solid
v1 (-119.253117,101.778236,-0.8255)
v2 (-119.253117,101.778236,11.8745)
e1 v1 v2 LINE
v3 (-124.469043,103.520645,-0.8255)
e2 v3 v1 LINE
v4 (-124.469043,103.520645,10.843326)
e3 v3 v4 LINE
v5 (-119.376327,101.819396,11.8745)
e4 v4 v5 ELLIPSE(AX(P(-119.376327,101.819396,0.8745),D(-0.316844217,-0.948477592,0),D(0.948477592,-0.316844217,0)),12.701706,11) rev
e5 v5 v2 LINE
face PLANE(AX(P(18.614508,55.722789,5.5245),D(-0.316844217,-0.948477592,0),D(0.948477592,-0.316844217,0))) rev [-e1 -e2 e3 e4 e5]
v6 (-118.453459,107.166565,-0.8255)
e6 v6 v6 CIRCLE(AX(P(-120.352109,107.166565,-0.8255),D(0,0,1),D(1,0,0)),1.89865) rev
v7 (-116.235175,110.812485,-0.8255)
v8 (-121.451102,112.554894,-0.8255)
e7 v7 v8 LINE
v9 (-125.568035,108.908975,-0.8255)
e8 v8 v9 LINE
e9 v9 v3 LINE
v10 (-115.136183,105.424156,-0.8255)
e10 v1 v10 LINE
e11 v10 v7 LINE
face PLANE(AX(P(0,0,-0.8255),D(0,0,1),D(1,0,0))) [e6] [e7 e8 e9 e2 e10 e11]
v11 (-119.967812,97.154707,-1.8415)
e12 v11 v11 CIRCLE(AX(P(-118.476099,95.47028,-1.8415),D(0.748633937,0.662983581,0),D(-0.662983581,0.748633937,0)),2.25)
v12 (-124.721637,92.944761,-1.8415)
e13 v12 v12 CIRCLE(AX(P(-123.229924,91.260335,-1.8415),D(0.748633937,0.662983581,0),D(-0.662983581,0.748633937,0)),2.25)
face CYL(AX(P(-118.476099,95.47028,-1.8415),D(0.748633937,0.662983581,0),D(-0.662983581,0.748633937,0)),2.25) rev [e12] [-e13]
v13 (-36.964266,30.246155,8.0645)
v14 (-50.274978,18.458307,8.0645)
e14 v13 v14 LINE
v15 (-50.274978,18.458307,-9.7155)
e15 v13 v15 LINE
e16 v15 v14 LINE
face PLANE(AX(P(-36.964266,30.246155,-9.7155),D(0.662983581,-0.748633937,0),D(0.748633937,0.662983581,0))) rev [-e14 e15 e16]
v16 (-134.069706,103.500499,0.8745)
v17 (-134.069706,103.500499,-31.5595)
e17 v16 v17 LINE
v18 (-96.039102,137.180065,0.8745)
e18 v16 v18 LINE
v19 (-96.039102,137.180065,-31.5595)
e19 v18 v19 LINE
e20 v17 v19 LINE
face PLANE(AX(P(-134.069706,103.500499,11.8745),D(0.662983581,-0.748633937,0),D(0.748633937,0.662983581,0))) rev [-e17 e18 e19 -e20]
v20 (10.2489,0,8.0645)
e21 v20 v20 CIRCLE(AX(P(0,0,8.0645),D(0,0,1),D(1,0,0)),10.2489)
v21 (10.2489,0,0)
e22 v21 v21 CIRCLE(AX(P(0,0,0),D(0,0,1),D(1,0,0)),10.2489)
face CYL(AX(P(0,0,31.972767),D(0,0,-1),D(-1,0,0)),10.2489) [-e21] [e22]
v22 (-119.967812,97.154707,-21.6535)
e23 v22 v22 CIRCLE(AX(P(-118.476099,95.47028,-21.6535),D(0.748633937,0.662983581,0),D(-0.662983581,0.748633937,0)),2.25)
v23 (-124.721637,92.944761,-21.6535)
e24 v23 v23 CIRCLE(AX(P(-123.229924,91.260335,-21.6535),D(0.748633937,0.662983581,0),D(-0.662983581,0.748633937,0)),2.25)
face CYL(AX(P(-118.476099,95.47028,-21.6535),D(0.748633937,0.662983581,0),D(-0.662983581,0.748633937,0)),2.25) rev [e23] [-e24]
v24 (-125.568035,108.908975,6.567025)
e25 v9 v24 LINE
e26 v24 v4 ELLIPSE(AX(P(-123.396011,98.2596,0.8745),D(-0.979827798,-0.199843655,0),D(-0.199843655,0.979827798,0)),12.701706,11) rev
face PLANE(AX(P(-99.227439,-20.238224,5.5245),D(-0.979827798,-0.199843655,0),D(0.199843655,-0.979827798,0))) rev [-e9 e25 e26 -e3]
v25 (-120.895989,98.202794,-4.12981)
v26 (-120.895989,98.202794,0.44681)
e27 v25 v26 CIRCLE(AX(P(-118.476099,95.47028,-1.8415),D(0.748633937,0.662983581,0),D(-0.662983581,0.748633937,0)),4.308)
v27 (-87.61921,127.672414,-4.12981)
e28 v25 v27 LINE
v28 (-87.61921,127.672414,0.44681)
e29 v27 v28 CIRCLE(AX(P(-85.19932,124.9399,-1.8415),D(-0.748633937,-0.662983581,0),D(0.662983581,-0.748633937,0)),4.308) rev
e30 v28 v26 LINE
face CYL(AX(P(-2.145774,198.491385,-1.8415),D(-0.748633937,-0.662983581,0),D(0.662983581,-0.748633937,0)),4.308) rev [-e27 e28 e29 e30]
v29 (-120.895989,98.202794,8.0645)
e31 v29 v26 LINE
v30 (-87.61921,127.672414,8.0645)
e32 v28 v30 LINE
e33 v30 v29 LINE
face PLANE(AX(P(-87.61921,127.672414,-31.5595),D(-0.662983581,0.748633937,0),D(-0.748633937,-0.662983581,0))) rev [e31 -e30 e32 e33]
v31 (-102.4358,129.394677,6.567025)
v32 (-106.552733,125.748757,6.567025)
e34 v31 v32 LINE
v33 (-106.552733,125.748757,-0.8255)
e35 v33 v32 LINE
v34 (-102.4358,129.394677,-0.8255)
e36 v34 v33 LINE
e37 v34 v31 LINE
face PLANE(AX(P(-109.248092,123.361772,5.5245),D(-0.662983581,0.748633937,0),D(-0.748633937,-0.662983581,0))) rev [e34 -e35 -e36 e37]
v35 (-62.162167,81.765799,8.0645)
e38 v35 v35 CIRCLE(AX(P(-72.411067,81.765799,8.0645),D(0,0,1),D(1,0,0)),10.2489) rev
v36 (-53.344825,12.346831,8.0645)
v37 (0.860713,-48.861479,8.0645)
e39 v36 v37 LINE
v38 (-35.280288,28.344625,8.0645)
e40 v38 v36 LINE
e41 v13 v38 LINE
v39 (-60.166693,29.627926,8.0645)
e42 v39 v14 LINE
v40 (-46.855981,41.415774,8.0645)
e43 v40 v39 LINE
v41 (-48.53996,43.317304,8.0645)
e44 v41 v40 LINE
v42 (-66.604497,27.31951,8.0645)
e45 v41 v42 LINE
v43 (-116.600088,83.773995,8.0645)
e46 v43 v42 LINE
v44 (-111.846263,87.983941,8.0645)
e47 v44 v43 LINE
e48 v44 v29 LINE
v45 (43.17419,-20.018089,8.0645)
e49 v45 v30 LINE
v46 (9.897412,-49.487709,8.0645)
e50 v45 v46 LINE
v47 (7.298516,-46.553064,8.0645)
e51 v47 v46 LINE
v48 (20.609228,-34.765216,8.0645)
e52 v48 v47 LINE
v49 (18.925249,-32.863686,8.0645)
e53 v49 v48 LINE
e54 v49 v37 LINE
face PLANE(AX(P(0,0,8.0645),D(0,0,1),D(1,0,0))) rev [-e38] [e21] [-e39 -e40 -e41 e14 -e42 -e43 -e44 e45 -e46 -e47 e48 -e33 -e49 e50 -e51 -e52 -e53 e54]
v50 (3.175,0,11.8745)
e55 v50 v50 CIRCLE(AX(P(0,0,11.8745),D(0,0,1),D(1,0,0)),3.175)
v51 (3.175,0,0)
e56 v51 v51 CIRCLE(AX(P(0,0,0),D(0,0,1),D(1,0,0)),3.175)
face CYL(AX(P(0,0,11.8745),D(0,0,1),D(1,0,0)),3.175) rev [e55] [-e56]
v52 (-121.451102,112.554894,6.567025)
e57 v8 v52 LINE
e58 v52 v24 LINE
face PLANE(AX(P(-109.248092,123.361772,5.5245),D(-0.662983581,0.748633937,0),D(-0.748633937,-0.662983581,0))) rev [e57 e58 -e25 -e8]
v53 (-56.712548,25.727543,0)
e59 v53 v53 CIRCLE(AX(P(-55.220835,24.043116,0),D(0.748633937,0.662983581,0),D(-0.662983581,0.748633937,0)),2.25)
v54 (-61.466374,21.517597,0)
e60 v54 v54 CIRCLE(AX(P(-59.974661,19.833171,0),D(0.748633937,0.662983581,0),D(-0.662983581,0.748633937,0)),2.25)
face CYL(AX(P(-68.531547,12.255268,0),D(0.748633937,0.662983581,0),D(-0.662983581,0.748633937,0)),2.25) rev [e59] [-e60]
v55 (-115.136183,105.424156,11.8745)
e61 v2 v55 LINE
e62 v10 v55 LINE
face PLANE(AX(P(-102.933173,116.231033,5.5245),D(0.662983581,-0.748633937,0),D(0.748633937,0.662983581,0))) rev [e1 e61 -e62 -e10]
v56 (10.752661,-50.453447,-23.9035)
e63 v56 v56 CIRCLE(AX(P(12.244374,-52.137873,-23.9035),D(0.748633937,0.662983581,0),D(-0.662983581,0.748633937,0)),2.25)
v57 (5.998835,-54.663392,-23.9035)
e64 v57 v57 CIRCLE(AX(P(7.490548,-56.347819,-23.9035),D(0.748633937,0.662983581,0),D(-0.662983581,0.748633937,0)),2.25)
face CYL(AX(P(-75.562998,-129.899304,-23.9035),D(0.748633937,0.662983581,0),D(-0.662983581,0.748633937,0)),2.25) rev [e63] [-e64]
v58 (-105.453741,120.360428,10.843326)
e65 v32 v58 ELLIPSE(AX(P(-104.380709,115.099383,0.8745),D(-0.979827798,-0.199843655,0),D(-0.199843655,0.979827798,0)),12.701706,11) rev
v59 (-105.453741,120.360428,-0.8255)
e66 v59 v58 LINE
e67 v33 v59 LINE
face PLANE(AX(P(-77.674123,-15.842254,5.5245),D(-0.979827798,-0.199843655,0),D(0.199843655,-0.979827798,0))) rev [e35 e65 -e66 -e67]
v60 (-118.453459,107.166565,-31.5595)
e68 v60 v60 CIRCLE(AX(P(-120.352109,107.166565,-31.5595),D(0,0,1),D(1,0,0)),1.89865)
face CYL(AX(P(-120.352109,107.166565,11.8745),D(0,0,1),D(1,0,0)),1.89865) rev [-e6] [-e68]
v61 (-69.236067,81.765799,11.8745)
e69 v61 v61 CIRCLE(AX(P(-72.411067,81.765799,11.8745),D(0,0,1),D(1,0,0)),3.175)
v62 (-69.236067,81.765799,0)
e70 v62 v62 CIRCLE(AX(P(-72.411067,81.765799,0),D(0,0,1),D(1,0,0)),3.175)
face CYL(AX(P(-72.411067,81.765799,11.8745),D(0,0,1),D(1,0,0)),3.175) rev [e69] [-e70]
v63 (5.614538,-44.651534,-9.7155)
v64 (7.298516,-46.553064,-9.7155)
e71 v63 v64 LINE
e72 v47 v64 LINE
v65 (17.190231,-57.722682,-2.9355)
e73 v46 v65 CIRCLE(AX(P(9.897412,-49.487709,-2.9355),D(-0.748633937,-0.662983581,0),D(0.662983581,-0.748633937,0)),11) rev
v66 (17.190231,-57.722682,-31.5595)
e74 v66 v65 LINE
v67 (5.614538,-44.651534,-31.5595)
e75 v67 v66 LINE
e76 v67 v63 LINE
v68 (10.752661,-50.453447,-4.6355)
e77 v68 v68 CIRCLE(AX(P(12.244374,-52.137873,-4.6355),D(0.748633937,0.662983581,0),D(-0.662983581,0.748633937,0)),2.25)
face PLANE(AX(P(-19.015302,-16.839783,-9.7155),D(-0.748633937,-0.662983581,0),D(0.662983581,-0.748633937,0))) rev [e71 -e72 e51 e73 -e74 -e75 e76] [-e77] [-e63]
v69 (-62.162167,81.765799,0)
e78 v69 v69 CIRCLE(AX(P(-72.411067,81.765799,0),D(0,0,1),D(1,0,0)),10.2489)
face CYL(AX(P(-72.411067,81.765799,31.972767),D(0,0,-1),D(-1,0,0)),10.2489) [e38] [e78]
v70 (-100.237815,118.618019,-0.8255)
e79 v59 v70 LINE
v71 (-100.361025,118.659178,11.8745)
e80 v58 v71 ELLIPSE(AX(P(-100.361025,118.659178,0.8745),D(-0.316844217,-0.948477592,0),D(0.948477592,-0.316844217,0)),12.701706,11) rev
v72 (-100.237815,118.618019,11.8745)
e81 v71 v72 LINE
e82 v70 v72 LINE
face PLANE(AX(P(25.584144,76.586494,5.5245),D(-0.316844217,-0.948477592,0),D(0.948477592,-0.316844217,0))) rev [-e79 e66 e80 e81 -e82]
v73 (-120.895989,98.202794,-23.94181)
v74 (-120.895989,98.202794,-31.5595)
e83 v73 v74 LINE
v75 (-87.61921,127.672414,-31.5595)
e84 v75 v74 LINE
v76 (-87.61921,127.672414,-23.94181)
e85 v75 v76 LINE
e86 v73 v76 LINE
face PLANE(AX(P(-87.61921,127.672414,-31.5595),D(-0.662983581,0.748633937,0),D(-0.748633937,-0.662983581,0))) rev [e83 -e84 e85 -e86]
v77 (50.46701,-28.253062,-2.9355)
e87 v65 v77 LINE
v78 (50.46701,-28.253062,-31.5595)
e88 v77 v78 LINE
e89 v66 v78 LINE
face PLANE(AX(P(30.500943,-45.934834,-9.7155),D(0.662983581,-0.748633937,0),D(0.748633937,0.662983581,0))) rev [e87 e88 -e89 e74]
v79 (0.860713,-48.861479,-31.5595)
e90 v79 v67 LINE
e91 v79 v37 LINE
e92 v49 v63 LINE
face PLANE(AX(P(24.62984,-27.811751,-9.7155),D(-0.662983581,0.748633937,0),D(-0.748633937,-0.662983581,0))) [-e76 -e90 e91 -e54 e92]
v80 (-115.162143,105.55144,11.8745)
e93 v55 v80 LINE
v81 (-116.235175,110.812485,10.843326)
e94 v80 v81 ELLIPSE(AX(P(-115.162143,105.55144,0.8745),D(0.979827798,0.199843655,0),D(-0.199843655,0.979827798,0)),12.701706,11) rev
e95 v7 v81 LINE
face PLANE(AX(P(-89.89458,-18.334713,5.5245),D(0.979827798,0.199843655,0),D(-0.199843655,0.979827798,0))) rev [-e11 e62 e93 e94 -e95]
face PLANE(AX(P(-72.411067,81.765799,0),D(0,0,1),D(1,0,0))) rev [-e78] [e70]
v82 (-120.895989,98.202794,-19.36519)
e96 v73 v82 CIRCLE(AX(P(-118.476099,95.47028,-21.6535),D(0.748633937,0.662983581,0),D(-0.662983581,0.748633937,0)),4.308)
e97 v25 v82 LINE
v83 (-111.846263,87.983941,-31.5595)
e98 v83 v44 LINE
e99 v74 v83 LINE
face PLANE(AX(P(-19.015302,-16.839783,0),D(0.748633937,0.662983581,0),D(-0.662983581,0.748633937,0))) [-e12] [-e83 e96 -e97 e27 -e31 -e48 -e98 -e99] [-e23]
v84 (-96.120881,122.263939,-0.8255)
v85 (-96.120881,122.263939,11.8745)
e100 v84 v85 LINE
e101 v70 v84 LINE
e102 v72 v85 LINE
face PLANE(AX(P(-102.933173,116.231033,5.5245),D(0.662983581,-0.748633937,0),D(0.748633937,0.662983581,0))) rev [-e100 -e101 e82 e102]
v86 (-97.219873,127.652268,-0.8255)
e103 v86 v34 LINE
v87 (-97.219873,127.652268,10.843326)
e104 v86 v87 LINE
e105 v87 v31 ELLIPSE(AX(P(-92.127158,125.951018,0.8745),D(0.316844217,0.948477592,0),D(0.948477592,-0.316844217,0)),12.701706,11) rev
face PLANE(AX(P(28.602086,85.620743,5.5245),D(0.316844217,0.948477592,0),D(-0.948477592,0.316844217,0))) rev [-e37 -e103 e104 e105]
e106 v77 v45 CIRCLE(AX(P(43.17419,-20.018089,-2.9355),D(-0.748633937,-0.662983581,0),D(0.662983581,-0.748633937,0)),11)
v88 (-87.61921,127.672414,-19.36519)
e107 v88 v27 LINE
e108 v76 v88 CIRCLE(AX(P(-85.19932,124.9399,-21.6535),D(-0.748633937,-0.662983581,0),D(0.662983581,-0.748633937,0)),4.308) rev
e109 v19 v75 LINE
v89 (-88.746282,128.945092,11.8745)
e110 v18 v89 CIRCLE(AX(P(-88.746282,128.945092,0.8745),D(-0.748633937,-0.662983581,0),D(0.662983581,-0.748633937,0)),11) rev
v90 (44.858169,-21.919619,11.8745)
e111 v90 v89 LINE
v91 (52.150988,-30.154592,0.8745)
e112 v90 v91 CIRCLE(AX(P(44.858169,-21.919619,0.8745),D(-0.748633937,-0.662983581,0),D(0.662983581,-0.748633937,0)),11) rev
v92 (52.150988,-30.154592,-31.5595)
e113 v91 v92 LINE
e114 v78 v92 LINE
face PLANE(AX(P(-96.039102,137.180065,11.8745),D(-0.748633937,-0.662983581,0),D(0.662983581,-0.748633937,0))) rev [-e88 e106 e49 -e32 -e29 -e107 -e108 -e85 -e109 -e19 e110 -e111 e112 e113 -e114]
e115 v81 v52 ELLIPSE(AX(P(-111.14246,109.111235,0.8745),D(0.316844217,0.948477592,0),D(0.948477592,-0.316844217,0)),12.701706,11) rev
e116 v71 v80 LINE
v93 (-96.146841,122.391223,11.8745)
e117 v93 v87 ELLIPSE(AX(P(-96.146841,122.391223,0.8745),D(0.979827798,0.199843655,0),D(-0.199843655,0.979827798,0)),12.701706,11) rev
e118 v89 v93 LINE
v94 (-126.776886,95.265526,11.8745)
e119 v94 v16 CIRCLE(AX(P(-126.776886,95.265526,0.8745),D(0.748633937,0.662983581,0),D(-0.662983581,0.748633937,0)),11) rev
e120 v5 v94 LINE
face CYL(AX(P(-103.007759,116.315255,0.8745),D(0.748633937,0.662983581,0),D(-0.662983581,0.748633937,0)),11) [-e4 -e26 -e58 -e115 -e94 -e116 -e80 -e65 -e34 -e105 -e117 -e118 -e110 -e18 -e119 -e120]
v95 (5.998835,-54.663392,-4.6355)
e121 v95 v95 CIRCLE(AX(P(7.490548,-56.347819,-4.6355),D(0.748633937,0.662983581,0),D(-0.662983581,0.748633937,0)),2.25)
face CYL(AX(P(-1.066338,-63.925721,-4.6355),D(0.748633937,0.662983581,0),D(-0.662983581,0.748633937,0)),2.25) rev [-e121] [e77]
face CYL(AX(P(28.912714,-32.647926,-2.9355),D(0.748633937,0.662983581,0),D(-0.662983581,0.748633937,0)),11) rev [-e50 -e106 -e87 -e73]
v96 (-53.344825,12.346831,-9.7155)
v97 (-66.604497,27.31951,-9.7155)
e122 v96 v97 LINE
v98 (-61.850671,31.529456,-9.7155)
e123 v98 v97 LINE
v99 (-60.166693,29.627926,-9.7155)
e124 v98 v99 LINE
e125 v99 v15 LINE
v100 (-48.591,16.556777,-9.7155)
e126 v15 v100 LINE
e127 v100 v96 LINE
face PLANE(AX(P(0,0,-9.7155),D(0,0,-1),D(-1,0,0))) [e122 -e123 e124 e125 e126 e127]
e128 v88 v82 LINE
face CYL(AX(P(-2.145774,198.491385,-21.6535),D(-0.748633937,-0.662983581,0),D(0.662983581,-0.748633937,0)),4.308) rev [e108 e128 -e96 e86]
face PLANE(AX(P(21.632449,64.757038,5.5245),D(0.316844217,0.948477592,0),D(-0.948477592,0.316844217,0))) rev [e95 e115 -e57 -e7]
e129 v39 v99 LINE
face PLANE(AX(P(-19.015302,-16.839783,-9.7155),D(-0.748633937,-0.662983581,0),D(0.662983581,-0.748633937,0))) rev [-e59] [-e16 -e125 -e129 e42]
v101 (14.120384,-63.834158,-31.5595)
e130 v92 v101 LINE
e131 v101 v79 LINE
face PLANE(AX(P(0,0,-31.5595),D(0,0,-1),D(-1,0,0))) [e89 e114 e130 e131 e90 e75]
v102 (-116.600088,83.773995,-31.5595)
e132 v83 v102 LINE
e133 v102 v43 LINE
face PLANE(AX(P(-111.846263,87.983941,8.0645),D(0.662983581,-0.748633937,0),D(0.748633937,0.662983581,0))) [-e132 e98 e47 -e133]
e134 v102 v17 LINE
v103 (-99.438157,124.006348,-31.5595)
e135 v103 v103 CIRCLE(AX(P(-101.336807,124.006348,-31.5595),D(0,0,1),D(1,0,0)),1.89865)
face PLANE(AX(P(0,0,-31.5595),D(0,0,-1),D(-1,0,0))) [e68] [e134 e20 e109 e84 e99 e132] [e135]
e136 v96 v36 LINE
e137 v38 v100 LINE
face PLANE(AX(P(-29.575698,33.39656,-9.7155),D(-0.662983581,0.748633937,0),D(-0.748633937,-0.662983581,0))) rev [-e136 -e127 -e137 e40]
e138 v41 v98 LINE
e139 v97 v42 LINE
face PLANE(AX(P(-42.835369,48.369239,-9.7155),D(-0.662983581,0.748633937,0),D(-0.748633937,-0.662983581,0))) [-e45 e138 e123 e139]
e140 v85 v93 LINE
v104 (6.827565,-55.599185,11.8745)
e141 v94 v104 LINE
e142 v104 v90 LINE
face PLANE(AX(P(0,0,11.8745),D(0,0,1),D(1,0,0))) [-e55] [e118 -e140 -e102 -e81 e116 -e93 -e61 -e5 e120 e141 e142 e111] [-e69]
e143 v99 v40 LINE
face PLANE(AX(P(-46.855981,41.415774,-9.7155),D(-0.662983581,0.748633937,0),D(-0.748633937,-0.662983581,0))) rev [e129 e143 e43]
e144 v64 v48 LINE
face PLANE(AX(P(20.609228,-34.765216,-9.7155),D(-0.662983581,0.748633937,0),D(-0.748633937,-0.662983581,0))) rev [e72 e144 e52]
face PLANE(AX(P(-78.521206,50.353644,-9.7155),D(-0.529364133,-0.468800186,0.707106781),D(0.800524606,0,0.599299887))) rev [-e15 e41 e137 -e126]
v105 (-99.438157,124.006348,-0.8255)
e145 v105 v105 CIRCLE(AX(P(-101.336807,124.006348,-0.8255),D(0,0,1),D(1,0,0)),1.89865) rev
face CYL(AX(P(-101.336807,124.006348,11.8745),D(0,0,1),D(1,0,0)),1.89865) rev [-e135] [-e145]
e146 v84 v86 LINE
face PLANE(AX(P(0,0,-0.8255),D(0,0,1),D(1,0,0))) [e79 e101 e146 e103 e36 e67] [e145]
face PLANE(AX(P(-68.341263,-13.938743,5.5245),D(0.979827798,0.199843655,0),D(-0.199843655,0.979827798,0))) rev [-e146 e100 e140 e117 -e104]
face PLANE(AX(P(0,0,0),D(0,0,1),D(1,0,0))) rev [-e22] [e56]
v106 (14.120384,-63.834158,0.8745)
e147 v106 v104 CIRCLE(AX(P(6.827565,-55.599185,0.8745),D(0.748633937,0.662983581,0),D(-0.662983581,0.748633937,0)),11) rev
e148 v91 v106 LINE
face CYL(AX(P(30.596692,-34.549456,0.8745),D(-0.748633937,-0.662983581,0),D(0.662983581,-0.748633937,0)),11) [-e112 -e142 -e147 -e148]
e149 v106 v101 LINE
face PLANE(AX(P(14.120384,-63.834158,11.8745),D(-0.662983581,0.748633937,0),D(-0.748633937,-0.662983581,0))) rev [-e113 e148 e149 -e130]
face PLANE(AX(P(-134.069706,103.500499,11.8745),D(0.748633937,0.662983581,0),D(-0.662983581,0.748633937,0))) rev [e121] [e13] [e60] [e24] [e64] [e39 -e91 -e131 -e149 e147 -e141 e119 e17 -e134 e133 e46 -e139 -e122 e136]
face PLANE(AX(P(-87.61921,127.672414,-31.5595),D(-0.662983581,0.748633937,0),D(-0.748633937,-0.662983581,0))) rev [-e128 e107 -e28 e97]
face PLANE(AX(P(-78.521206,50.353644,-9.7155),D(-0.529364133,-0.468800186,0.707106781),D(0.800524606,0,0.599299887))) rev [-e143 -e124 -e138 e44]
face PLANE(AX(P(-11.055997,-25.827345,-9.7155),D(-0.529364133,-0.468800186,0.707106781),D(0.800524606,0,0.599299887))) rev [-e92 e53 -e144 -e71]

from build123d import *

# Parameters (mm, degrees)
SKETCH1_R                   = 10.2489
BOSS_EXTRUDE1_DEPTH         = 2.9845
BOSS_EXTRUDE1_2_DEPTH       = 2.9845
SKETCH2_R                   = 10.2489
BOSS_EXTRUDE2_DEPTH         = 5.08
BOSS_EXTRUDE3_DEPTH         = 3.81
F_1_4_0_25_DIAMETER_HOLE1_D = 6.35
BOSS_EXTRUDE4_DEPTH         = 17.78
SKETCH8_R                   = 2.25
CUT_EXTRUDE1_DEPTH          = 17.78
SKETCH9_W                   = 17.78
SKETCH9_H                   = 2.54
BOSS_EXTRUDE5_DEPTH         = 17.78
CUT_EXTRUDE2_REACH          = 251.195
CUT_EXTRUDE3_DEPTH          = 20
BOSS_EXTRUDE6_DEPTH         = 2.54
BOSS_EXTRUDE7_DEPTH         = 39.624
F_6_CLEARANCE_HOLE1_D       = 3.7973
CUT_EXTRUDE4_DEPTH          = 6.35
SKETCH17_W                  = 39.624
SKETCH17_H                  = 20
BOSS_EXTRUDE8_DEPTH         = 6.35
M4_CLEARANCE_HOLE1_D        = 4.5
SKETCH21_R                  = 4.308
CUT_EXTRUDE5_DEPTH          = 195.822050963
FILLET2_R                   = 11
CUT_EXTRUDE6_DEPTH          = 6.35
BOSS_EXTRUDE9_DEPTH         = 21.844
CUT_EXTRUDE7_DEPTH          = 195.822050963


with BuildPart() as part:
    # Sketch1 → Boss-Extrude1 (new body)
    with BuildSketch(Plane.XY):
        Circle(SKETCH1_R)
    extrude(amount=BOSS_EXTRUDE1_DEPTH)



with BuildPart() as body_2:
    # Sketch1 → Boss-Extrude1 2 (new body)
    with BuildSketch(Plane.XY):
        with Locations((-72.411066703, 81.765798589)):
            Circle(SKETCH1_R)
    extrude(amount=BOSS_EXTRUDE1_2_DEPTH)


with BuildPart() as part_1:
    add(part.part)

    add(body_2.part)  # Boss-Extrude2 merges body 2
    # Sketch2 → Boss-Extrude2 (add)
    with BuildSketch(Plane.XY.offset(2.9845)):
        with Locations((-72.411066703, 81.765798589)):
            Circle(SKETCH2_R)
        Circle(SKETCH2_R)
    extrude(amount=BOSS_EXTRUDE2_DEPTH)

    # Sketch3 → Boss-Extrude3 (add)
    with BuildSketch(Plane.XY.offset(8.0645)):
        Polygon((-134.069705847, 103.500499391), (-96.039101852, 137.180065299), (52.150988145, -30.154592279), (14.12038415, -63.834158187), align=None)
    extrude(amount=BOSS_EXTRUDE3_DEPTH)

    # 1/4 (0.25) Diameter Hole1 (through all)
    with Locations(Plane.XY.offset(11.8745)):
        with Locations((0, 0), (-72.411066703, 81.765798589)):
            Hole(F_1_4_0_25_DIAMETER_HOLE1_D / 2)

    # Sketch7 → Boss-Extrude4 (add)
    with BuildSketch(Plane(origin=(0, 0, 8.0645), x_dir=(-1, 0, 0), z_dir=(0, 0, -1))):
        Polygon((66.604496657, 27.319509971), (61.850671158, 31.529455709), (48.59099954, 16.556776971), (53.34482504, 12.346831233), align=None)
        Polygon((-14.12038415, -63.834158187), (-0.860712533, -48.861479449), (-5.614538032, -44.65153371), (-18.87420965, -59.624212449), align=None)
    extrude(amount=BOSS_EXTRUDE4_DEPTH)

    # Sketch8 → Cut-Extrude1 (cut)
    with BuildSketch(Plane(origin=(-19.015301997, -16.839782954, 0), x_dir=(0, 0, -1), z_dir=(0.7486339369082557, 0.6629835808745536, 0))):
        with Locations(Location((4.6355, -47.15, 0), (0, 0, 90))):
            Circle(SKETCH8_R)
        with Locations(Location((0, 54.61, 0), (0, 0, 90))):
            Circle(SKETCH8_R)
    extrude(amount=-CUT_EXTRUDE1_DEPTH, mode=Mode.SUBTRACT)

    # Sketch9 → Boss-Extrude5 (add)
    with BuildSketch(Plane(origin=(-19.015301997, -16.839782954, 0), x_dir=(0, 0, -1), z_dir=(0.7486339369082557, 0.6629835808745536, 0))):
        with Locations((0.8255, -55.88)):
            Rectangle(SKETCH9_W, SKETCH9_H)
        with Locations((0.8255, 45.88)):
            Rectangle(SKETCH9_W, SKETCH9_H)
        with Locations((0.8255, 63.34)):
            Rectangle(SKETCH9_W, SKETCH9_H)
        with Locations((0.8255, -38.42)):
            Rectangle(SKETCH9_W, SKETCH9_H)
    extrude(amount=BOSS_EXTRUDE5_DEPTH)

    # Cut-Extrude2: up to this face of the body (flat: up to its plane)
    cut_extrude2_end = Plane(part_1.part.faces().sort_by_distance((9.892980981, -40.862582546, -0.8255))[0])
    # Sketch10 → Cut-Extrude2 (cut, up to the picked face)
    with BuildSketch(Plane(origin=(37.889511647, -42.784429494, 0), x_dir=(0.7486339369082557, 0.6629835808745536, 0), z_dir=(0.6629835808745536, -0.7486339369082557, 0)), mode=Mode.PRIVATE) as cut_extrude2_sk1:
        Polygon((-7.62, 8.0645), (-7.62, -9.7155), (-25.4, -9.7155), align=None)
    cut_extrude2_tool1 = split(extrude(cut_extrude2_sk1.sketch, amount=-CUT_EXTRUDE2_REACH, mode=Mode.PRIVATE), bisect_by=cut_extrude2_end, keep=Keep.BOTH, mode=Mode.PRIVATE)
    add(cut_extrude2_tool1.solids().sort_by(Axis((27.748017, -51.765647, -3.788833), (-0.6629835808745536, 0.7486339369082557, 0)))[0], mode=Mode.SUBTRACT)

    # Sketch11 → Cut-Extrude3 (cut)
    with BuildSketch(Plane(origin=(-29.575697543, 33.396559925, 0), x_dir=(0.748633936908256, 0.6629835808745533, 0), z_dir=(0.6629835808745533, -0.748633936908256, 0))):
        Polygon((-7.62, -9.7155), (-7.62, 8.0645), (-25.4, -9.7155), align=None)
    extrude(amount=-CUT_EXTRUDE3_DEPTH, mode=Mode.SUBTRACT)

    # Sketch12 → Boss-Extrude6 (add)
    with BuildSketch(Plane(origin=(37.889511647, -42.784429494, 0), x_dir=(0.7486339369082557, 0.6629835808745536, 0), z_dir=(0.6629835808745536, -0.7486339369082557, 0))):
        Polygon((-25.4, -9.7155), (19.05, -9.7155), (19.05, 8.0645), (-7.62, 8.0645), align=None)
    extrude(amount=-BOSS_EXTRUDE6_DEPTH)

    # Sketch13 → Boss-Extrude7 (add)
    with BuildSketch(Plane(origin=(0, 0, 8.0645), x_dir=(-1, 0, 0), z_dir=(0, 0, -1))):
        Polygon((96.039101852, 137.180065299), (134.069705847, 103.500499391), (125.64981437, 93.992848392), (87.619210375, 127.6724143), align=None)
    extrude(amount=BOSS_EXTRUDE7_DEPTH)

    # #6 Clearance Hole1 (through all)
    with Locations(Plane.XY.offset(11.8745)):
        with Locations((-120.35210911, 107.166565368), (-101.336807112, 124.006348323)):
            Hole(F_6_CLEARANCE_HOLE1_D / 2)

    # Sketch14 → Cut-Extrude4 (cut)
    with BuildSketch(Plane.XY.offset(11.8745)):
        Polygon((-106.55273324, 125.748757468), (-105.45374076, 120.360428364), (-97.219873465, 127.652268281), (-102.435799592, 129.394677426), align=None)
        Polygon((-97.219873465, 127.652268281), (-105.45374076, 120.360428364), (-100.237814632, 118.618019219), (-96.120880984, 122.263939177), align=None)
        Polygon((-125.568035237, 108.908974514), (-124.469042757, 103.52064541), (-116.235175462, 110.812485327), (-121.45110159, 112.554894472), align=None)
        Polygon((-116.235175462, 110.812485327), (-124.469042757, 103.52064541), (-119.25311663, 101.778236265), (-115.136182982, 105.424156223), align=None)
    extrude(amount=-CUT_EXTRUDE4_DEPTH, mode=Mode.SUBTRACT)

    # Sketch17 → Boss-Extrude8 (add)
    with BuildSketch(Plane(origin=(-23.769127497, -21.049728693, 0), x_dir=(0, 0, 1), z_dir=(-0.7486339369082559, -0.6629835808745536, 0))):
        with Locations((-11.7475, 150.02)):
            Rectangle(SKETCH17_W, SKETCH17_H)
    extrude(amount=-BOSS_EXTRUDE8_DEPTH)

    # M4 Clearance Hole1 (through all)
    with Locations(Plane(origin=(-19.015301997, -16.839782954, 0), x_dir=(0, 0, -1), z_dir=(0.7486339369082559, 0.6629835808745536, 0))):
        with Locations((1.8415, 150.02), (21.6535, 150.02)):
            Hole(M4_CLEARANCE_HOLE1_D / 2)

    # Sketch21 → Cut-Extrude5 (cut, through all)
    with BuildSketch(Plane(origin=(-19.015301997, -16.839782954, 0), x_dir=(0, 0, -1), z_dir=(0.7486339369082559, 0.6629835808745536, 0))):
        with Locations((21.6535, 150.02)):
            Circle(SKETCH21_R)
        with Locations((1.8415, 150.02)):
            Circle(SKETCH21_R)
    extrude(amount=CUT_EXTRUDE5_DEPTH, mode=Mode.SUBTRACT)

    # Fillet2
    # the kernel refuses this fillet: 11 mm, written as the material it adds along each edge
    with BuildSketch(Plane(origin=(50.46700985, -28.253062079, 8.0645), x_dir=(-0.6629835808745533, 0.7486339369082559, 1.2918958832001814e-15), z_dir=(-0.748633936908256, -0.6629835808745534, 0))) as fillet2_piece_1:
        with BuildLine():
            CenterArc((FILLET2_R, FILLET2_R), FILLET2_R, 180, 90)
            Line((0, FILLET2_R), (0, 0))
            Line((0, 0), (FILLET2_R, 0))
        make_face()
    extrude(amount=44.45)
    # the kernel refuses this fillet: 11 mm, written as the material it takes off along each edge
    with BuildSketch(Plane(origin=(72.73842141, -11.922543805, 11.8745), x_dir=(-0.6629835808745536, 0.7486339369082557, 0), z_dir=(-0.7486339369082559, -0.6629835808745537, 0))) as fillet2_2_piece_1:
        with BuildLine():
            CenterArc((FILLET2_R, FILLET2_R), FILLET2_R, 180, 90)
            Line((0, FILLET2_R), (0, 0))
            Line((0, 0), (FILLET2_R, 0))
        make_face()
    extrude(amount=105.8, mode=Mode.SUBTRACT)
    with BuildSketch(Plane(origin=(-154.657139112, 85.268450917, 11.8745), x_dir=(0, 0, -1), z_dir=(0.7486339369082557, 0.6629835808745537, 0))) as fillet2_2_piece_2:
        with BuildLine():
            CenterArc((FILLET2_R, -FILLET2_R), FILLET2_R, 90, 90)
            Line((0, -FILLET2_R), (0, 0))
            Line((0, 0), (FILLET2_R, 0))
        make_face()
    extrude(amount=105.8, mode=Mode.SUBTRACT)

    # Sketch22 → Cut-Extrude6 (cut)
    with BuildSketch(Plane.XY.offset(5.5245)):
        Polygon((-121.45110159, 112.554894472), (-125.568035237, 108.908974514), (-124.469042757, 103.52064541), (-119.25311663, 101.778236265), (-115.136182982, 105.424156223), (-116.235175462, 110.812485327), align=None)
        Polygon((-102.435799592, 129.394677426), (-106.55273324, 125.748757468), (-105.45374076, 120.360428364), (-100.237814632, 118.618019219), (-96.120880984, 122.263939177), (-97.219873465, 127.652268281), align=None)
    extrude(amount=-CUT_EXTRUDE6_DEPTH, mode=Mode.SUBTRACT)

    # Sketch24 → Boss-Extrude9 (add)
    with BuildSketch(Plane(origin=(0, 0, -9.7155), x_dir=(-1, 0, 0), z_dir=(0, 0, -1))):
        Polygon((-7.298516327, -46.55306391), (-17.190231354, -57.722682249), (-50.46700985, -28.253062079), (-52.150988145, -30.154592279), (-14.12038415, -63.834158187), (-0.860712533, -48.861479449), (-5.614538032, -44.65153371), align=None)
    extrude(amount=BOSS_EXTRUDE9_DEPTH)

    # Sketch25 → Cut-Extrude7 (cut, through all)
    with BuildSketch(Plane(origin=(-19.015301997, -16.839782954, 0), x_dir=(0, 0, -1), z_dir=(0.7486339369082557, 0.6629835808745536, 0))):
        with BuildLine():
            ThreePointArc((26.1535, -47.15), (25.494490258, -45.559009742), (23.9035, -44.9))
            Line((23.9035, -44.9), (23.9035, -47.15))
            Line((23.9035, -47.15), (21.6535, -47.15))
            ThreePointArc((21.6535, -47.15), (23.9035, -49.4), (26.1535, -47.15))
        make_face()
        with BuildLine():
            Line((23.9035, -47.15), (23.9035, -44.9))
            ThreePointArc((23.9035, -44.9), (22.312509742, -45.559009742), (21.6535, -47.15))
            Line((21.6535, -47.15), (23.9035, -47.15))
        make_face()
    extrude(amount=-CUT_EXTRUDE7_DEPTH, mode=Mode.SUBTRACT)


solid = part_1.part
